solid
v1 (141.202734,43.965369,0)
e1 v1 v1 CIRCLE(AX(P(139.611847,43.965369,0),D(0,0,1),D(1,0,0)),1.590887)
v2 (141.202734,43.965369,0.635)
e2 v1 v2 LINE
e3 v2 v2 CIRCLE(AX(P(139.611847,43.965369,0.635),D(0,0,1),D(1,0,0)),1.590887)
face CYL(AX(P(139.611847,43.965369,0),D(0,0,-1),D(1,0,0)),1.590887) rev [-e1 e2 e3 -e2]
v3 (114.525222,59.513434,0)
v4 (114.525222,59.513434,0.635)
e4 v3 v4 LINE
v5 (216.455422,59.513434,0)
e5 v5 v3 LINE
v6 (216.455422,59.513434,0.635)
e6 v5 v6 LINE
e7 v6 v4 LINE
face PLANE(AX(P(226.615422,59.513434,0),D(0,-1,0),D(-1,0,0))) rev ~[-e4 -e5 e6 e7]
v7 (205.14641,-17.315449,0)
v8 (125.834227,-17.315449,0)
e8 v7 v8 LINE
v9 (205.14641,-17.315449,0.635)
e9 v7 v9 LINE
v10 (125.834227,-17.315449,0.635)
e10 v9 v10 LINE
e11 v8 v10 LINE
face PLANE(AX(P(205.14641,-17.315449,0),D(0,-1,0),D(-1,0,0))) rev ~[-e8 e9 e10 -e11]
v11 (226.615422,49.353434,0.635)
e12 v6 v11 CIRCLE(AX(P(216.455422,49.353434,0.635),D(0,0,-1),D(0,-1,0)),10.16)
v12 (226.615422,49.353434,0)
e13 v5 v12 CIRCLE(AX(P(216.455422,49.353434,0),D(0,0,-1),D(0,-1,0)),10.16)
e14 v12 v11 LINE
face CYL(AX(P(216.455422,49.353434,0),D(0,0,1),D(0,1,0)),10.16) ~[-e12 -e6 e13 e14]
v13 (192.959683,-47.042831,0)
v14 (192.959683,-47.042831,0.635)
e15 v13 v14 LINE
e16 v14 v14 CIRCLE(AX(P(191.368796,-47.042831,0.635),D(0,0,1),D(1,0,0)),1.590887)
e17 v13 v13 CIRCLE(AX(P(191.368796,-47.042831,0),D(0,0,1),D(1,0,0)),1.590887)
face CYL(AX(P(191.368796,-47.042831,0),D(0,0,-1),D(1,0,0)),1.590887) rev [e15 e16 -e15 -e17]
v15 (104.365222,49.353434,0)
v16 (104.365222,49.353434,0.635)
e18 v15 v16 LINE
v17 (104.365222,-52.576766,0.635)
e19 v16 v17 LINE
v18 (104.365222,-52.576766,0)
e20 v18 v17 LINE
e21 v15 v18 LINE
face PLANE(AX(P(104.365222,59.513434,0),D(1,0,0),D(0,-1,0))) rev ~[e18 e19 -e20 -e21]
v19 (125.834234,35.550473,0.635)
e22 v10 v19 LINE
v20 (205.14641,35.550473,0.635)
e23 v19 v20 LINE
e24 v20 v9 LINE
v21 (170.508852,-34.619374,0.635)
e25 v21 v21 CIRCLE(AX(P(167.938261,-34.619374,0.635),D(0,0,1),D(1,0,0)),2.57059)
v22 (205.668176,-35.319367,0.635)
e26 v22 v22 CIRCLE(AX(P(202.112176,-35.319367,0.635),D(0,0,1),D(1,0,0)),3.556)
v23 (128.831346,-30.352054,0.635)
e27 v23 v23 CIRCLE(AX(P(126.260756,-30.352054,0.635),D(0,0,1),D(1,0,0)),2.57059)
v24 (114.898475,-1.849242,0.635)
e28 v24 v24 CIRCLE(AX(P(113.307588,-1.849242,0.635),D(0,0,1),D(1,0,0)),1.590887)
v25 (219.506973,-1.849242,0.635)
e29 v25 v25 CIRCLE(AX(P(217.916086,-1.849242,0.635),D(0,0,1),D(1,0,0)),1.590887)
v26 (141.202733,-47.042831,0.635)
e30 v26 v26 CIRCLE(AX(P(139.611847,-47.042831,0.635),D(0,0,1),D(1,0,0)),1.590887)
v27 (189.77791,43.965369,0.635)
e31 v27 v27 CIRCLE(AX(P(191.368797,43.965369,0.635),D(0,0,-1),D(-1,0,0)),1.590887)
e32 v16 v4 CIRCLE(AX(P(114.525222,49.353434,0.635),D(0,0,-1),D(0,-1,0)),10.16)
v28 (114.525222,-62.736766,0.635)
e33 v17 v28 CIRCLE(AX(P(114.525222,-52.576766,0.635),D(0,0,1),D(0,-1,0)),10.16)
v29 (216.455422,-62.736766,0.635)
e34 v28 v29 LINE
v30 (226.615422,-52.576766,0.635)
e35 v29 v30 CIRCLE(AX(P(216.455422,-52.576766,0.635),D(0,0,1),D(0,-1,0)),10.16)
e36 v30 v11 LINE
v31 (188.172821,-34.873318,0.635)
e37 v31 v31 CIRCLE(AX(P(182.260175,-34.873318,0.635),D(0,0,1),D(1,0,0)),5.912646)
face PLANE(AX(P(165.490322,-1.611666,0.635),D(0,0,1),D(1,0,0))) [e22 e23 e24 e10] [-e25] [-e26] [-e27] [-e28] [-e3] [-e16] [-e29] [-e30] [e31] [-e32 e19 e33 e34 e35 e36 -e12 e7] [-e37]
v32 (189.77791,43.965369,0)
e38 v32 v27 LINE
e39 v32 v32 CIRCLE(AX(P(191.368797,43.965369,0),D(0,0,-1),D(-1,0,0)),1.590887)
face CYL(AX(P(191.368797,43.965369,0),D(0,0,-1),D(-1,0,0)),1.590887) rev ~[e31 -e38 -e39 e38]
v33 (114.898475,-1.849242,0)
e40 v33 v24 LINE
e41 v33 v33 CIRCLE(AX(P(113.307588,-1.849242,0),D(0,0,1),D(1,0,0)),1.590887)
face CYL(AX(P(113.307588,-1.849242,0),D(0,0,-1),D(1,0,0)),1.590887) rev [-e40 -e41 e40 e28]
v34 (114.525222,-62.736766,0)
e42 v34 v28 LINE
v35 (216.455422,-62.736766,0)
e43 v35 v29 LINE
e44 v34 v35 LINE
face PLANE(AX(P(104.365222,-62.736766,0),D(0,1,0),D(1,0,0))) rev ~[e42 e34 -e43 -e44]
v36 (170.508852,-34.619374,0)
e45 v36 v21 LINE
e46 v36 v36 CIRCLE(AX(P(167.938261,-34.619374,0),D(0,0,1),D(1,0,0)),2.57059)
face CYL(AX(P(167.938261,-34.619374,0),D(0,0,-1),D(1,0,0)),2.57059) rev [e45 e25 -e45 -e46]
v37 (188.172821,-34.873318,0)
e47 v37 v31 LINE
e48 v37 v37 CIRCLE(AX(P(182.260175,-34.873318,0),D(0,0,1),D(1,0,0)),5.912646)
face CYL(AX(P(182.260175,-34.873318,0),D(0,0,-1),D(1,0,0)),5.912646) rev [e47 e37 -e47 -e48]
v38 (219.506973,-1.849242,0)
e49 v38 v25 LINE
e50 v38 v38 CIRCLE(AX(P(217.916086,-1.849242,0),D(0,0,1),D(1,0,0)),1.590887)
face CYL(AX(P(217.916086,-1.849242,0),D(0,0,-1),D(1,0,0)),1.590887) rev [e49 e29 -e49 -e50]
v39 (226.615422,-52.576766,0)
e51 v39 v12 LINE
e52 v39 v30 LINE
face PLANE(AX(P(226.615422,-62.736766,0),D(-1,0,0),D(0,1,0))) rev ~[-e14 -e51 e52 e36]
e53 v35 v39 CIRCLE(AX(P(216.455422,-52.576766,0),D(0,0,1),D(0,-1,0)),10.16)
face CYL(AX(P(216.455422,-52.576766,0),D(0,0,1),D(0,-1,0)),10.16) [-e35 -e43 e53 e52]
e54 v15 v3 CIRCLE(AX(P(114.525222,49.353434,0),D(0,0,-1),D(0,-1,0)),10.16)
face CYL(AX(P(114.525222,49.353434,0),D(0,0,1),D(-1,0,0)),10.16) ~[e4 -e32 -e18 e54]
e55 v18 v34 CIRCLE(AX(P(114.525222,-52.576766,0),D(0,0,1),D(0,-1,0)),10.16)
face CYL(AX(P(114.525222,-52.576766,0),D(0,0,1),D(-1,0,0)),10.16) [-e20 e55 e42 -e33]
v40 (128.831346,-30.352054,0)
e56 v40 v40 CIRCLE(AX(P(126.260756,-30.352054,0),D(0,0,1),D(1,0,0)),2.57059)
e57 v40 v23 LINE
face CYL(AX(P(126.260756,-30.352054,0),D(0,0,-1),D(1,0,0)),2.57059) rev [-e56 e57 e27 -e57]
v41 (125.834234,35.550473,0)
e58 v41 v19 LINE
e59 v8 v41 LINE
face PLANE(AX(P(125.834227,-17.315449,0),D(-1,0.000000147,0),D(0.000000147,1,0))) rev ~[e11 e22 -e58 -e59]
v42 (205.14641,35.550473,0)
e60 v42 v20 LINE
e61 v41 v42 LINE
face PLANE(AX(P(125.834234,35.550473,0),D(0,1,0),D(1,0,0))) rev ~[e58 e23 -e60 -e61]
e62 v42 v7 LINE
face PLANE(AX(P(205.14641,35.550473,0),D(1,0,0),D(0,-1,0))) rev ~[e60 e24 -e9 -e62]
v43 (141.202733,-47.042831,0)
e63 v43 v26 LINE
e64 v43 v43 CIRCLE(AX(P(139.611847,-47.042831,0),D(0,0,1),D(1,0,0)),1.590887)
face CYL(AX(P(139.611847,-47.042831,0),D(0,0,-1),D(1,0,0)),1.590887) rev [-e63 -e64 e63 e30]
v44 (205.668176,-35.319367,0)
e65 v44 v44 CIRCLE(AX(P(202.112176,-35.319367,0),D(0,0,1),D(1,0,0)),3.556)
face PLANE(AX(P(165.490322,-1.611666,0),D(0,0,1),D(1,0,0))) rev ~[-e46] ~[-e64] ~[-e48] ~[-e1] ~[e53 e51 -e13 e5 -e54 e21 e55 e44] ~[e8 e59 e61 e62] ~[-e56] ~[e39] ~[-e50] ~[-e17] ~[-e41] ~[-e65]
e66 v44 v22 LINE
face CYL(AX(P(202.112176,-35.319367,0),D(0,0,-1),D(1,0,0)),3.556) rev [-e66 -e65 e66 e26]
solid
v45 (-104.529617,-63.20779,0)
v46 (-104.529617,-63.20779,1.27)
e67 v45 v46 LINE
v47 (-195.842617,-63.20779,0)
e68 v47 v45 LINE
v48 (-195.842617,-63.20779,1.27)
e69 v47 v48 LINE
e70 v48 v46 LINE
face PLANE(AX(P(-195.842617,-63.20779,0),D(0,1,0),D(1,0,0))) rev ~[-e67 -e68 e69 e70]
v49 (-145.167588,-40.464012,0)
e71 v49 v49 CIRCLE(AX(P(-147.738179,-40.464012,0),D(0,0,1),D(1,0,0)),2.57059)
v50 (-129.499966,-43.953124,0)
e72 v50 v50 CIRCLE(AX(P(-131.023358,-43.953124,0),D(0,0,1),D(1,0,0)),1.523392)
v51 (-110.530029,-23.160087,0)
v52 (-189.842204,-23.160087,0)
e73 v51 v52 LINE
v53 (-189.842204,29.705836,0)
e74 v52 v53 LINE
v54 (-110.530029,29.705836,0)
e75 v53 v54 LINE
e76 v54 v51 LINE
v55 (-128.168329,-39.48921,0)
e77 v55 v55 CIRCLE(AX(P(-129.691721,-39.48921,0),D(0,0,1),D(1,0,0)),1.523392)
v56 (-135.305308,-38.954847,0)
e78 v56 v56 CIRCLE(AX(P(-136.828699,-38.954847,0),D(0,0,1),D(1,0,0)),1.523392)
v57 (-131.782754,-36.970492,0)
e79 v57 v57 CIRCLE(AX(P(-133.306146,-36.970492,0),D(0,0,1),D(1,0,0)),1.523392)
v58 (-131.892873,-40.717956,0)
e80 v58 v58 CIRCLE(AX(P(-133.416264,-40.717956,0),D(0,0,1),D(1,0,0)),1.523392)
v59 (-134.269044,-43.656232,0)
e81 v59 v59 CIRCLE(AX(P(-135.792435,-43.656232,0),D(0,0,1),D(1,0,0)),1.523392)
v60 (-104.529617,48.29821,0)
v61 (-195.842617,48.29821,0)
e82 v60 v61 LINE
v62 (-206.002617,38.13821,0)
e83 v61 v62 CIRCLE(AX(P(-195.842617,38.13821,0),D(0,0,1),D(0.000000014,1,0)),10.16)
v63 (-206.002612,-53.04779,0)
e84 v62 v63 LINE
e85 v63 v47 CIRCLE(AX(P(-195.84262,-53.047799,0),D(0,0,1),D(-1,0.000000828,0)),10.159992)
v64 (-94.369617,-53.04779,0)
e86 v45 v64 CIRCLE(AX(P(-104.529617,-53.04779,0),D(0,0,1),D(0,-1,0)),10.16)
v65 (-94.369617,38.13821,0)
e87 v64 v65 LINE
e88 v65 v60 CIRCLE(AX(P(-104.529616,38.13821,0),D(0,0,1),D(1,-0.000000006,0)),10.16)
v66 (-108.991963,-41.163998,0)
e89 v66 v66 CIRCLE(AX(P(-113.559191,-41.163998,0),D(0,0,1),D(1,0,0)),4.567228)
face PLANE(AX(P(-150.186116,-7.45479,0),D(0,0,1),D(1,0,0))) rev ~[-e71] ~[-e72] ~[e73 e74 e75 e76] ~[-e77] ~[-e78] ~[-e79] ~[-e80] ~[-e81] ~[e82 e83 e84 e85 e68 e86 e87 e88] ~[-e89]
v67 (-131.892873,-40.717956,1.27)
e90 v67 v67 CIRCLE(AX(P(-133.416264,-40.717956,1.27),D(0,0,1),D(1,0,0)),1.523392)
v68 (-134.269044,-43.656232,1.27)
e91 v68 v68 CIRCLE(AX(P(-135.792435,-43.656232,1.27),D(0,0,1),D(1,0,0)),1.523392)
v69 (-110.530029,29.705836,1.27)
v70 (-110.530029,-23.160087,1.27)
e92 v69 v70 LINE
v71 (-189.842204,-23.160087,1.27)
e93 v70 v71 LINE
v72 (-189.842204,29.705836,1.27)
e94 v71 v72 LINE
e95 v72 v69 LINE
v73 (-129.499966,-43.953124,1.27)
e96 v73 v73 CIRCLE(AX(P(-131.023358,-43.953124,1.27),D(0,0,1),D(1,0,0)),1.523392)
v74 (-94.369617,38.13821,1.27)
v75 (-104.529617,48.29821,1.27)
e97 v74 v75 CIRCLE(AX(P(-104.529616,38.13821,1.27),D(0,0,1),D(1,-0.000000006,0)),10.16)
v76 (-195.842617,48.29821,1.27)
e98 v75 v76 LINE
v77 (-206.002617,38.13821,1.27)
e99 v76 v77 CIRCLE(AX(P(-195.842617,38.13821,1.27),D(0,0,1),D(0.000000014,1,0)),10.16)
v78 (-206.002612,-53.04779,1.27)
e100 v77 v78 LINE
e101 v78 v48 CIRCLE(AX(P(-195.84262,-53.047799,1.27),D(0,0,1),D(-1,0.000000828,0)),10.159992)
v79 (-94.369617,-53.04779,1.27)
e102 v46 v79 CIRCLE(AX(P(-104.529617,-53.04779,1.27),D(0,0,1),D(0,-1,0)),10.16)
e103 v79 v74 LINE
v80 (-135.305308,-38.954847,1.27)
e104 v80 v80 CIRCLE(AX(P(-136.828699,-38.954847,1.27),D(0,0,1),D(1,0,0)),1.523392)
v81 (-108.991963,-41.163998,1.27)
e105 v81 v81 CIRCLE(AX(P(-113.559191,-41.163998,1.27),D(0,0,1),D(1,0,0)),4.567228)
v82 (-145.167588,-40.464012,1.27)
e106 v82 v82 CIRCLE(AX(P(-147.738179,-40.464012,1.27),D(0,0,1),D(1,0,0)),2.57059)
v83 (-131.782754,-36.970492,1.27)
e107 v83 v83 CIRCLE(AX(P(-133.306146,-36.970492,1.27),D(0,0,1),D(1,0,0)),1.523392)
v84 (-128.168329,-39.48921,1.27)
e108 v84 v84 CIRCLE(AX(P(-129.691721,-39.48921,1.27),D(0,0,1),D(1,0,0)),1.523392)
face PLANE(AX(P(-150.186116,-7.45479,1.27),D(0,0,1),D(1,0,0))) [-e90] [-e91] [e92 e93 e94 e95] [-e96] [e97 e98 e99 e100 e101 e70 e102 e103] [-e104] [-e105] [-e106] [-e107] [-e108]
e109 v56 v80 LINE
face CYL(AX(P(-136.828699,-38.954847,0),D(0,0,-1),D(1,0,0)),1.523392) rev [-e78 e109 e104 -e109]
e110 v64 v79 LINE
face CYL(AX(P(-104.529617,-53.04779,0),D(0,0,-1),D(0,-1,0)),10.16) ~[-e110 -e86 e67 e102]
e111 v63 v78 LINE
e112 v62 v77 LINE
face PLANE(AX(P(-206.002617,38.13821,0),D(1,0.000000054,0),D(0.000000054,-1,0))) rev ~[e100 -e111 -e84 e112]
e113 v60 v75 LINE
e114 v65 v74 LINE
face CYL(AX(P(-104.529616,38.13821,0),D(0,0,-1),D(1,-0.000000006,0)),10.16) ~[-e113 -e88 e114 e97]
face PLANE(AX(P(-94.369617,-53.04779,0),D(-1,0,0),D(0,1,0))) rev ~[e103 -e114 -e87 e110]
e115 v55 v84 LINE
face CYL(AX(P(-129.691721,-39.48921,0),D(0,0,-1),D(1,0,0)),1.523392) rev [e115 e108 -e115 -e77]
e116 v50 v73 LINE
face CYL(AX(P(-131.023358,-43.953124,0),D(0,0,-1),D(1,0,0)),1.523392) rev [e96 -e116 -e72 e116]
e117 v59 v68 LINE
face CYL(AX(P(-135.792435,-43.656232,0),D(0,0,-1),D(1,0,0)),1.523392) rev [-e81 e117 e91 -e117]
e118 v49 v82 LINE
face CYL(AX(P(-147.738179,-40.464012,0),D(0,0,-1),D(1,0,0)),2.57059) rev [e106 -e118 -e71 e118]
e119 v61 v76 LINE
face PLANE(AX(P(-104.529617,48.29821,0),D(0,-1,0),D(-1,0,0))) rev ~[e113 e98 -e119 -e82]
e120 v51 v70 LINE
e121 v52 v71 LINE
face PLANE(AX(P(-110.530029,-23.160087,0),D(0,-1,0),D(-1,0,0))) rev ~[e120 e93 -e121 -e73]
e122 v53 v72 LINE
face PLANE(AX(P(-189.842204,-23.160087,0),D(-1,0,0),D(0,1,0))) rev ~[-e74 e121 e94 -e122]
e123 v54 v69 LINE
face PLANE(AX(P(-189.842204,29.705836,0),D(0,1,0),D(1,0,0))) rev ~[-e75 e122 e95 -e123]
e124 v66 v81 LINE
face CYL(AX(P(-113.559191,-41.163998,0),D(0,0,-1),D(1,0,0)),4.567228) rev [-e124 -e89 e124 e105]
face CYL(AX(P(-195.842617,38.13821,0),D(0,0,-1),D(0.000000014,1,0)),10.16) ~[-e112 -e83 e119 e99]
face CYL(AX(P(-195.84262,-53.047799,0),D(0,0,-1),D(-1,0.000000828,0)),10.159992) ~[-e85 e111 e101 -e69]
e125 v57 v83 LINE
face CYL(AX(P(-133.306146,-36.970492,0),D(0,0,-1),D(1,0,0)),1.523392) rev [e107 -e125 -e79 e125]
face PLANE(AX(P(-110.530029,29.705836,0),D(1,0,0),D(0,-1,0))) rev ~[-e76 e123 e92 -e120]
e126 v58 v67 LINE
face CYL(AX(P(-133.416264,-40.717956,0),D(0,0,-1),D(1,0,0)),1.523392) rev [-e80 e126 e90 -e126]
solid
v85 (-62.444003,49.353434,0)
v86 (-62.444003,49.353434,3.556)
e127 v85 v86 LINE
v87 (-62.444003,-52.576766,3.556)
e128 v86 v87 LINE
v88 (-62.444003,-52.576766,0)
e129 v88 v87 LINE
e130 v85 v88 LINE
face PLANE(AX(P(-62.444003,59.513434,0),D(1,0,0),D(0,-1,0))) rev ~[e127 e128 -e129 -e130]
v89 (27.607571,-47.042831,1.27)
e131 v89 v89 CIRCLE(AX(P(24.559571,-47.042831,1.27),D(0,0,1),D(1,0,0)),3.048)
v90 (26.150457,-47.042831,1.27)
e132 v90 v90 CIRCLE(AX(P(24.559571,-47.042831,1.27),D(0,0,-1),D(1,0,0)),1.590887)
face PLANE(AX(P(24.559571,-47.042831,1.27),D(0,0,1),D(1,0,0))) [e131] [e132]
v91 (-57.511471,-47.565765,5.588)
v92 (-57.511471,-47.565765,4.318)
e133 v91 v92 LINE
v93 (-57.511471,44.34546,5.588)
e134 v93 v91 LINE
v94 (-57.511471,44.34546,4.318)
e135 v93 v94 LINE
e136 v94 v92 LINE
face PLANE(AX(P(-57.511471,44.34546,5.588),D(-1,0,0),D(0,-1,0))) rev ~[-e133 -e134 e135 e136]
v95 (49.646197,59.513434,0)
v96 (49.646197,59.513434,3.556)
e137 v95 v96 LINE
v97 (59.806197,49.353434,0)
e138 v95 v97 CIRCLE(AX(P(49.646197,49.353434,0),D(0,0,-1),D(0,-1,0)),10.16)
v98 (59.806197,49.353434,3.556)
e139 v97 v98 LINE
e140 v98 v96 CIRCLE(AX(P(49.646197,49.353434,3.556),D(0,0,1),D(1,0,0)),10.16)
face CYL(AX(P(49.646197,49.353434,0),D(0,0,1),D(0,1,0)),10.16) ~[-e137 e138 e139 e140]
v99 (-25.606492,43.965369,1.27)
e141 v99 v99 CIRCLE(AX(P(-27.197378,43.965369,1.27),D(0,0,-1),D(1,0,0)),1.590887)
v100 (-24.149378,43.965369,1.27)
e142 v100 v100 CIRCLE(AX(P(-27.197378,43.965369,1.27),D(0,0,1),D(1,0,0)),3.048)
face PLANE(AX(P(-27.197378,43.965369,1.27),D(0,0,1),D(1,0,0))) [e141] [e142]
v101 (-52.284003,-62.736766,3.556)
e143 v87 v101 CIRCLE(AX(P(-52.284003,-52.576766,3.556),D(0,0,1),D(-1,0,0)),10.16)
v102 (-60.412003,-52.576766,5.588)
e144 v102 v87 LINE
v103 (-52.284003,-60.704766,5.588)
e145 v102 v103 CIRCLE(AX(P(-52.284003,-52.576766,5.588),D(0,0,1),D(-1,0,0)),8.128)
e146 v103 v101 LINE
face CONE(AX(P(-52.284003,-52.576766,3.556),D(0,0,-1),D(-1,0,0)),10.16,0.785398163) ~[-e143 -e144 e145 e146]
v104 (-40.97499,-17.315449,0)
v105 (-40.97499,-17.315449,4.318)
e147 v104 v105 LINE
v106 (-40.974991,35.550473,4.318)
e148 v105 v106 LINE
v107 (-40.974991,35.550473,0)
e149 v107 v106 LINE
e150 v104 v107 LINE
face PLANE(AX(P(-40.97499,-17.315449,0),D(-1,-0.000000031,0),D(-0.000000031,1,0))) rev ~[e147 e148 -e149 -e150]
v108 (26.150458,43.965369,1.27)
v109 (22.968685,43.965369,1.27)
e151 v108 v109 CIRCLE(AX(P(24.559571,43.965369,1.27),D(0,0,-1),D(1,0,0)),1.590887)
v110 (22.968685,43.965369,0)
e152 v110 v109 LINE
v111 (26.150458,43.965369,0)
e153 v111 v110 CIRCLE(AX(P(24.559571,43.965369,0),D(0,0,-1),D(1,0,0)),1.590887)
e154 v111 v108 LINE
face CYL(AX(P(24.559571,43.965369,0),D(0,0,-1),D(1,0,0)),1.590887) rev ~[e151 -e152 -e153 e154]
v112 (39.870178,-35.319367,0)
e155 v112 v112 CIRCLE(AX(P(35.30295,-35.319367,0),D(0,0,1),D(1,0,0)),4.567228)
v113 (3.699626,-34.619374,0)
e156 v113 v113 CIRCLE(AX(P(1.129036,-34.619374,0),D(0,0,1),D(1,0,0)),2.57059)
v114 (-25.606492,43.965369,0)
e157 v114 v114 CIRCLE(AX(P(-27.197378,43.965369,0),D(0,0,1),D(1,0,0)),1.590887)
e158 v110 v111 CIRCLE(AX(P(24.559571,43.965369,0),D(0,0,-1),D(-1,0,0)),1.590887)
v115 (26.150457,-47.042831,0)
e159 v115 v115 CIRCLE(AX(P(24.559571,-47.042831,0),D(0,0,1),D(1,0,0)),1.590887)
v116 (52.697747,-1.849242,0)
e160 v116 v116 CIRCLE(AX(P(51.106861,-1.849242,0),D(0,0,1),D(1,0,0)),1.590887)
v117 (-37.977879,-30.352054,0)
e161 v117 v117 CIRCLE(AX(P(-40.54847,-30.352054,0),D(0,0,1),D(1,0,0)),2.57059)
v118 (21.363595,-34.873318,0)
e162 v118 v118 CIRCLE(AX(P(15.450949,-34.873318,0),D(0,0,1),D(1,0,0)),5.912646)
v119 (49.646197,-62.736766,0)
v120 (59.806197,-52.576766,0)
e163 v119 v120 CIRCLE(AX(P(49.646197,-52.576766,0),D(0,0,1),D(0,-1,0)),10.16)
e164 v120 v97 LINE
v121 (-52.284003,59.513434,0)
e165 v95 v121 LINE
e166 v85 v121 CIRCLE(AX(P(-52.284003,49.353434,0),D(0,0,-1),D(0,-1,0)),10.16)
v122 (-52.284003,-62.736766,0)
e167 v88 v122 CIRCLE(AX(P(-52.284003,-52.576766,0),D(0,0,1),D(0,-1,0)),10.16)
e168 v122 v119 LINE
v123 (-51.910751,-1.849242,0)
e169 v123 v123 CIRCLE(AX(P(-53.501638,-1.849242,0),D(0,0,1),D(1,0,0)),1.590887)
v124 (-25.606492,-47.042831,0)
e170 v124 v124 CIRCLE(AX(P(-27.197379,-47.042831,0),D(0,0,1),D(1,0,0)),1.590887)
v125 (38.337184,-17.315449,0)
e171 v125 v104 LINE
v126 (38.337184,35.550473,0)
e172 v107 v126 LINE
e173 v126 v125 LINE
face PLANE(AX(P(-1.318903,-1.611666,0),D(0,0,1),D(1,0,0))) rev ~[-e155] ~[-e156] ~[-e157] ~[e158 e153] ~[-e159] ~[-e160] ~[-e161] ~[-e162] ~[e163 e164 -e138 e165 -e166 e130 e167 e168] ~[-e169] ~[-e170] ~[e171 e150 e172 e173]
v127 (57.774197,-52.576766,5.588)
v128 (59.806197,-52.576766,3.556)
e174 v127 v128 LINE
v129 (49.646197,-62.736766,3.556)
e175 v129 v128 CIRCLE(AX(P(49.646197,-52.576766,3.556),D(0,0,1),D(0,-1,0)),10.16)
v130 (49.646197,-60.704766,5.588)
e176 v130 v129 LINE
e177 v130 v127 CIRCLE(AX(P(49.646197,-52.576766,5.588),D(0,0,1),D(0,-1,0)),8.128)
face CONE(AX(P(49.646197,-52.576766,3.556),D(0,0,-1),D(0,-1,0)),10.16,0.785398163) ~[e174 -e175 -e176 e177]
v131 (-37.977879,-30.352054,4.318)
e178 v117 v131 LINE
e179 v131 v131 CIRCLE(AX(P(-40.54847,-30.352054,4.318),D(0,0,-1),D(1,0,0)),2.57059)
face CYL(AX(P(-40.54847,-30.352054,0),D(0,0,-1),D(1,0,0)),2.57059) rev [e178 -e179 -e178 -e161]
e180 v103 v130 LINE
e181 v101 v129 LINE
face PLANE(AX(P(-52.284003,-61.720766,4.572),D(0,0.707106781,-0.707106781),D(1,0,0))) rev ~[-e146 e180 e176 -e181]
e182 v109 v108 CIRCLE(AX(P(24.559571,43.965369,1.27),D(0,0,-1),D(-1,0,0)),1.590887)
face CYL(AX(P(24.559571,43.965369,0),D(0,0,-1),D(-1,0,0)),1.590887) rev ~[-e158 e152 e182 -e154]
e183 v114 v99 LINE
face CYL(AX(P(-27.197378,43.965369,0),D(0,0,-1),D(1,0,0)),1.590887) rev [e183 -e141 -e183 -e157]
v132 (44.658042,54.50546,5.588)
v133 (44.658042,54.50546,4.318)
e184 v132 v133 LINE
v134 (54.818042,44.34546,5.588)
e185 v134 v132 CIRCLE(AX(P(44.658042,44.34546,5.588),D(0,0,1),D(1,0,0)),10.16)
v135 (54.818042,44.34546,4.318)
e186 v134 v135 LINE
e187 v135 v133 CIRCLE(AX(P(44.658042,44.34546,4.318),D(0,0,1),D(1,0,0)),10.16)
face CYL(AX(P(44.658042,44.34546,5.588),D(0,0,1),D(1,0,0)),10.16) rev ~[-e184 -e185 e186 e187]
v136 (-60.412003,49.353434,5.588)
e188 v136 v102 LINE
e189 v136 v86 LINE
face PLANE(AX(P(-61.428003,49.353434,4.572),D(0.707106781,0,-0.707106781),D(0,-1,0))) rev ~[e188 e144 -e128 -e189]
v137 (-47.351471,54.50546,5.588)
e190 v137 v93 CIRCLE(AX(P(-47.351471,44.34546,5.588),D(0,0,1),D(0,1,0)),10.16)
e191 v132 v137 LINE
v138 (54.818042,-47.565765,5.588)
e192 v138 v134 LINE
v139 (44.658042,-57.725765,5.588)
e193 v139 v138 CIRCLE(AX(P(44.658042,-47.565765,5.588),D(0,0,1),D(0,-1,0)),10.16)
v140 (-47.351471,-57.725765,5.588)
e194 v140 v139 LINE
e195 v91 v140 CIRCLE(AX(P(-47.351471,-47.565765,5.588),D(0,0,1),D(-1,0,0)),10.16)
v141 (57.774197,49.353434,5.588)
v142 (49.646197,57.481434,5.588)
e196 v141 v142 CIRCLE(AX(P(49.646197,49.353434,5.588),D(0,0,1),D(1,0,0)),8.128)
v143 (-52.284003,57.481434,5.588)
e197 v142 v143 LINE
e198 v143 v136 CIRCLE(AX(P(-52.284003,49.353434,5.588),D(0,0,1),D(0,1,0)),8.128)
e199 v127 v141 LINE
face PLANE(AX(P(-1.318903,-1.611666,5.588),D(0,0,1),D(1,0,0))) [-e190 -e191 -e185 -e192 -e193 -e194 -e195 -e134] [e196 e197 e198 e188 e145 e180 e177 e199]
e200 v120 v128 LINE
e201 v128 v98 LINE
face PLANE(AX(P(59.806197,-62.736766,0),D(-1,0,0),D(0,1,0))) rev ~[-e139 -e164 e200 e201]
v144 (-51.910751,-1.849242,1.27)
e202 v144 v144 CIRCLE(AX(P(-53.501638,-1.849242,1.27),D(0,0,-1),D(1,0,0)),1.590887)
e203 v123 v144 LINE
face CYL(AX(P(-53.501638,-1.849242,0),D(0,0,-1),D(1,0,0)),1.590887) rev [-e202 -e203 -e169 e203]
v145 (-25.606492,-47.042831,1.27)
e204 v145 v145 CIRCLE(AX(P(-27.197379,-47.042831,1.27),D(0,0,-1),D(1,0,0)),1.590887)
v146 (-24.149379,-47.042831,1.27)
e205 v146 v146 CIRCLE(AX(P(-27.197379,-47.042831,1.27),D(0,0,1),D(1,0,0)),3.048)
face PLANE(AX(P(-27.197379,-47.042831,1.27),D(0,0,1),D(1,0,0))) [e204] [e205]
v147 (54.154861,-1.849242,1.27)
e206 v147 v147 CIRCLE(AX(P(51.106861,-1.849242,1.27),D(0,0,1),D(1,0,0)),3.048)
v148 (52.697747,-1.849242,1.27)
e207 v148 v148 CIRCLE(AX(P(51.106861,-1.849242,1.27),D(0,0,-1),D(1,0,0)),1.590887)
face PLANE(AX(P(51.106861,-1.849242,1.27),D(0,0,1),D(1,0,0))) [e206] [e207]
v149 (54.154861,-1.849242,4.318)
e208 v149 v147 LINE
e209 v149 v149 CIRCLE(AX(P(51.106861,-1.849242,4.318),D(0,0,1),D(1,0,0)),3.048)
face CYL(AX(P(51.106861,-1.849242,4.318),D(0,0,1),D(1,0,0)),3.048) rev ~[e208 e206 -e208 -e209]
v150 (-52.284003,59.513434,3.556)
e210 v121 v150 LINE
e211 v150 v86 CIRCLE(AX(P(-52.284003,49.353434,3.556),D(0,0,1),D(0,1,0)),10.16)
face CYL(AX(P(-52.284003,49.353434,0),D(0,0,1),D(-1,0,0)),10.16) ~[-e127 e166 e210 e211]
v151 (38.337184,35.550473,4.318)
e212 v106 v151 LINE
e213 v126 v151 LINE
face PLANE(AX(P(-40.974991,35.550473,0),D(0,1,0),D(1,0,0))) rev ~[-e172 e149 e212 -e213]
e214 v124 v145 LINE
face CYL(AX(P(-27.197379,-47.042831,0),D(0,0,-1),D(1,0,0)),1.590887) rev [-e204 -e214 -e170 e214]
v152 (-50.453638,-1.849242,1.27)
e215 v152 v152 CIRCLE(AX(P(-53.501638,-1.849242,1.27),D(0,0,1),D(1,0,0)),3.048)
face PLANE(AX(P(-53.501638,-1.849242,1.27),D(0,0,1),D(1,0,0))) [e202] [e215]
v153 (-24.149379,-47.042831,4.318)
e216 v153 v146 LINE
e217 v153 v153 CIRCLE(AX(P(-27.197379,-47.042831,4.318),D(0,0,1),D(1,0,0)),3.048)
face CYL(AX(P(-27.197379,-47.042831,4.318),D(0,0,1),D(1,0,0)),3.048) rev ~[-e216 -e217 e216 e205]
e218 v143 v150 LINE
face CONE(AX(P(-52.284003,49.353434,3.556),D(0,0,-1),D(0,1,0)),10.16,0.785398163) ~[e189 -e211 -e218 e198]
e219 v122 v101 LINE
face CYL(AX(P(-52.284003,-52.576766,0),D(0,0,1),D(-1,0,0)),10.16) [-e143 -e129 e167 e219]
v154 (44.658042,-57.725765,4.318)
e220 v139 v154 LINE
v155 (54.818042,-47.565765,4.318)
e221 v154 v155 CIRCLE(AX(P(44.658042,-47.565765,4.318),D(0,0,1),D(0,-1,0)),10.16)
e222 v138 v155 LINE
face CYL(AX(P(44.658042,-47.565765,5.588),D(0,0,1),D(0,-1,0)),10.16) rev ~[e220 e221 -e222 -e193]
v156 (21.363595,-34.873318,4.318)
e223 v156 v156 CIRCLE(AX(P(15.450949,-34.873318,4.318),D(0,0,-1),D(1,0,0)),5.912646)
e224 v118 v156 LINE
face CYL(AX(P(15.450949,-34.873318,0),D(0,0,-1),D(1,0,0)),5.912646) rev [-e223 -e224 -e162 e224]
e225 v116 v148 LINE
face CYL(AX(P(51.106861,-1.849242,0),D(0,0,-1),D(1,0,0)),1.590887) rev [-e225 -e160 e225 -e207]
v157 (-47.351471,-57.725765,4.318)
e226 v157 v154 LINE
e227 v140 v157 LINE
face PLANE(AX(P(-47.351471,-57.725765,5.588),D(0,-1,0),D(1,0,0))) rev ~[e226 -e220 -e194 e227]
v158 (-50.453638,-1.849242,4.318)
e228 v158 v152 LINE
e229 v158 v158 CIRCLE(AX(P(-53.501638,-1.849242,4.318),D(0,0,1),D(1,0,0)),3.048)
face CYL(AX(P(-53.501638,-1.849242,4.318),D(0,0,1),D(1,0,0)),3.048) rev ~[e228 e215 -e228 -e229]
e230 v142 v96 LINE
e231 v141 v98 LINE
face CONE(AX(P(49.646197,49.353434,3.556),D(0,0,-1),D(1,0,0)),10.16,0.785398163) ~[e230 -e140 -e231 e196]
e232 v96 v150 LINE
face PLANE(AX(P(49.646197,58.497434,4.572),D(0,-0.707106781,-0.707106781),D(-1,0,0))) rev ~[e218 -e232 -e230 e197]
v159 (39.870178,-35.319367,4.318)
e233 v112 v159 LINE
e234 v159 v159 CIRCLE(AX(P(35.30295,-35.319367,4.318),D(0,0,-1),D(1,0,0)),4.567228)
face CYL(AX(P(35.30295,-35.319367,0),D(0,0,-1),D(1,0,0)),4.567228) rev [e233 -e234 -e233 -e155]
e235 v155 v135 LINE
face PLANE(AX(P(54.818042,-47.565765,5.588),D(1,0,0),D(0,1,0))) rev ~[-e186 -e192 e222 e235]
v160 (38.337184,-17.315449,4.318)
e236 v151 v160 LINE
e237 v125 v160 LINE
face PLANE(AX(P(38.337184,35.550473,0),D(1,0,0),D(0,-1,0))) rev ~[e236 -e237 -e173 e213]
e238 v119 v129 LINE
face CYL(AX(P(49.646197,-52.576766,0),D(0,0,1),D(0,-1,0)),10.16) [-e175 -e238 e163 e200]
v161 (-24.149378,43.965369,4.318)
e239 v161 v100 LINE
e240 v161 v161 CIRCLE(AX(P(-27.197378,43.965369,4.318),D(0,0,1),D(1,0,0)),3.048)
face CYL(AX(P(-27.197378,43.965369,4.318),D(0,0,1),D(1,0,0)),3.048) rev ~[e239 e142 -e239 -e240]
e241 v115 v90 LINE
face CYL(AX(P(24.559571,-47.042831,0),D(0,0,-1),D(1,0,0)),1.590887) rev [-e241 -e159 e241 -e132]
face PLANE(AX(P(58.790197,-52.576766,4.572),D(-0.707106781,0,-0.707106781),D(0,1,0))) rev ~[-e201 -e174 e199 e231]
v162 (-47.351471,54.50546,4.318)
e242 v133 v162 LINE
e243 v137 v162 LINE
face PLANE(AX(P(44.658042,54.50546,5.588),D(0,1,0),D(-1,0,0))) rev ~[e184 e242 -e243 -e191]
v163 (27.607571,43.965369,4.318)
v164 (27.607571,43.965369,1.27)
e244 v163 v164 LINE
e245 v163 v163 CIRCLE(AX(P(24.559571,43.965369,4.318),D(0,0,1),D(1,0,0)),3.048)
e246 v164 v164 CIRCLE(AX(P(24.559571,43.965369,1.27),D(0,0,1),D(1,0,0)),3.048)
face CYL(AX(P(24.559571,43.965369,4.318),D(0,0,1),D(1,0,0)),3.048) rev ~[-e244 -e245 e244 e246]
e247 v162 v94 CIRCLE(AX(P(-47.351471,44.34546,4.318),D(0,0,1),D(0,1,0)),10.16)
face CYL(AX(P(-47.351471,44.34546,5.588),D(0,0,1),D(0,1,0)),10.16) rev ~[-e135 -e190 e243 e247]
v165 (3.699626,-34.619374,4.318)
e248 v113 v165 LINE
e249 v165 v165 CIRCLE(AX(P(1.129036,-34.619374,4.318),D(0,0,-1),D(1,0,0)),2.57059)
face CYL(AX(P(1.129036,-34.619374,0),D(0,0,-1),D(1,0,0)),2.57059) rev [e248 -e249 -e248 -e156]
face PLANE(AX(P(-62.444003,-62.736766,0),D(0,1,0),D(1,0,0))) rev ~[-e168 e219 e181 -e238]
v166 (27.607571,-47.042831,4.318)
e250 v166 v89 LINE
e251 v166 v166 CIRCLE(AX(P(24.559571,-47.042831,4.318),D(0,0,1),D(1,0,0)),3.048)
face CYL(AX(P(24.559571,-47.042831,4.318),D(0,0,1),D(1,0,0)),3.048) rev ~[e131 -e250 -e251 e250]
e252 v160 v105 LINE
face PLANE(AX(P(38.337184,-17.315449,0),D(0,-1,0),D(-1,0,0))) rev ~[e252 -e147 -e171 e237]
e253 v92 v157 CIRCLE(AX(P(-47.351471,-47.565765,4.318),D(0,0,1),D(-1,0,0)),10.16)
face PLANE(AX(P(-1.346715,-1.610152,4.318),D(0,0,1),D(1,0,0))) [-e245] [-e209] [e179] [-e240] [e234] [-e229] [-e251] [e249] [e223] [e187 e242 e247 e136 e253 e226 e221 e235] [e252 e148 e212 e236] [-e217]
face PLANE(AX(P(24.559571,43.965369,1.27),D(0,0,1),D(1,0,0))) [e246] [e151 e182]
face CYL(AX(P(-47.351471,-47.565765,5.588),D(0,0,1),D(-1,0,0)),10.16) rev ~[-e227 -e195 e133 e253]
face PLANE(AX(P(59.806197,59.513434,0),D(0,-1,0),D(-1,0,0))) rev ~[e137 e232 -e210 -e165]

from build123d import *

# Parameters (mm, degrees)
F0_R      = 1.5908867155
F0_R_2    = 2.5705904527
F0_R_3    = 5.9126459129
F0_R_4    = 4.5672278398
F1_DEPTH  = 5.588
F2_R      = 10.16
F3_SIZE   = 2.032
F0_R_5    = 3.556
F4_DEPTH  = 0.635
F5_R      = 10.16
F7_DEPTH  = 1.27
F8_R      = 3.048
F9_DEPTH  = 3.048
F10_R     = 2.5705904527
F10_R_2   = 1.5233915353
F10_R_3   = 4.5672278398
F11_DEPTH = 1.27


# Not quite as in the source:
# - ends of sketch curves that miss each other by under 0.0002 mm in the source are joined


with BuildPart() as f1:
    # F0 (on Top) → F1 (new body)
    with BuildSketch(Plane.XY):
        Polygon((-1.3189034303, 59.5134341434), (-62.4440034303, 59.5134341434), (-62.4440034303, -62.7367658566), (59.8061965697, -62.7367658566), (59.8061965697, 59.5134341434), align=None)
        with Locations((-27.1973789436, -47.042830537)):
            Circle(F0_R, mode=Mode.SUBTRACT)
        with Locations((1.1290358546, -34.6193742007)):
            Circle(F0_R_2, mode=Mode.SUBTRACT)
        with Locations((24.5595706861, -47.042830537)):
            Circle(F0_R, mode=Mode.SUBTRACT)
        with Locations((15.450949059, -34.8733179271)):
            Circle(F0_R_3, mode=Mode.SUBTRACT)
        with Locations((35.3029502789, -35.3193674237)):
            Circle(F0_R_4, mode=Mode.SUBTRACT)
        with Locations((-40.5484696616, -30.3520541638)):
            Circle(F0_R_2, mode=Mode.SUBTRACT)
        with Locations((-53.5016377839, -1.8492421368)):
            Circle(F0_R, mode=Mode.SUBTRACT)
        with Locations((51.1068607298, -1.8492421368)):
            Circle(F0_R, mode=Mode.SUBTRACT)
        Polygon((-40.9749911864, 35.5504732579), (-1.3189034303, 35.5504732579), (38.3371843259, 35.5504732579), (38.3371843259, -17.3154491931), (-40.9749895334, -17.3154491931), align=None, mode=Mode.SUBTRACT)
        with Locations((-27.1973782451, 43.965369463)):
            Circle(F0_R, mode=Mode.SUBTRACT)
        with BuildLine():
            ThreePointArc((26.1504581, 43.965369463), (24.5595713845, 42.3744827475), (22.9686846691, 43.965369463))
            ThreePointArc((22.9686846691, 43.965369463), (24.5595713845, 45.5562561785), (26.1504581, 43.965369463))
        make_face(mode=Mode.SUBTRACT)
    extrude(amount=F1_DEPTH)

    # F2
    f2_edges = [f1.edges().sort_by_distance(p)[0] for p in [
        (-62.444003, 59.513434, 2.794),
        (-62.444003, -62.736766, 2.794),
        (59.806197, -62.736766, 2.794),
        (59.806197, 59.513434, 2.794),
    ]]
    fillet(f2_edges, radius=F2_R)

    # F3
    f3_edges = [f1.edges().sort_by_distance(p)[0] for p in [
        (-1.318903, 59.513434, 5.588),
    ]]
    chamfer(f3_edges, length=F3_SIZE)

    # F6 (on face) → F7 (cut)
    with BuildSketch(Plane.XY.offset(5.588)):
        with BuildLine():
            ThreePointArc((-57.5114712119, -47.565764811), (-54.5356761088, -54.7499697079), (-47.3514712119, -57.725764811))
            Line((-47.3514712119, -57.725764811), (-5.00380015, -57.725764811))
            Line((-5.00380015, -57.725764811), (44.6580416226, -57.725764811))
            ThreePointArc((44.6580416226, -57.725764811), (51.8422465195, -54.7499697079), (54.8180416226, -47.565764811))
            Line((54.8180416226, -47.565764811), (54.8180416226, 0))
            Line((54.8180416226, 0), (54.8180416226, 44.3454599643))
            ThreePointArc((54.8180416226, 44.3454599643), (51.8422465195, 51.5296648611), (44.6580416226, 54.5054599643))
            Line((44.6580416226, 54.5054599643), (-1.3284197776, 54.5054599643))
            Line((-1.3284197776, 54.5054599643), (-47.3514712119, 54.5054599643))
            ThreePointArc((-47.3514712119, 54.5054599643), (-54.5356761088, 51.5296648611), (-57.5114712119, 44.3454599643))
            Line((-57.5114712119, 44.3454599643), (-57.5114712119, 0))
            Line((-57.5114712119, 0), (-57.5114712119, -47.565764811))
        make_face()
    extrude(amount=-F7_DEPTH, mode=Mode.SUBTRACT)

    # F8 (on face) → F9 (cut)
    with BuildSketch(Plane.XY.offset(4.318)):
        with Locations((-27.1973782451, 43.965369463)):
            Circle(F8_R)
        with Locations((24.5595713845, 43.965369463)):
            Circle(F8_R)
        with Locations((-27.1973789436, -47.042830537)):
            Circle(F8_R)
        with Locations((24.5595706861, -47.042830537)):
            Circle(F8_R)
        with Locations((-53.5016377839, -1.8492421368)):
            Circle(F8_R)
        with Locations((51.1068607298, -1.8492421368)):
            Circle(F8_R)
    extrude(amount=-F9_DEPTH, mode=Mode.SUBTRACT)


with BuildPart() as f4:
    # F0 (on Top) → F4 (new body)
    with BuildSketch(Plane.XY):
        Polygon((165.490322156, 59.5134341434), (104.365222156, 59.5134341434), (104.365222156, -62.7367658566), (226.615422156, -62.7367658566), (226.615422156, 59.5134341434), align=None)
        with Locations((139.6118466427, -47.042830537)):
            Circle(F0_R, mode=Mode.SUBTRACT)
        with Locations((167.9382614409, -34.6193742007)):
            Circle(F0_R_2, mode=Mode.SUBTRACT)
        with Locations((182.2601746453, -34.8733179271)):
            Circle(F0_R_3, mode=Mode.SUBTRACT)
        with Locations((191.3687962724, -47.042830537)):
            Circle(F0_R, mode=Mode.SUBTRACT)
        with Locations((202.1121758653, -35.3193674237)):
            Circle(F0_R_5, mode=Mode.SUBTRACT)
        with Locations((126.2607559247, -30.3520541638)):
            Circle(F0_R_2, mode=Mode.SUBTRACT)
        with Locations((113.3075878024, -1.8492421368)):
            Circle(F0_R, mode=Mode.SUBTRACT)
        with Locations((217.9160863161, -1.8492421368)):
            Circle(F0_R, mode=Mode.SUBTRACT)
        Polygon((125.8342343999, 35.5504732579), (165.490322156, 35.5504732579), (205.1464099122, 35.5504732579), (205.1464099122, -17.3154491931), (125.8342266083, -17.3154491931), align=None, mode=Mode.SUBTRACT)
        with Locations((139.6118473412, 43.965369463)):
            Circle(F0_R, mode=Mode.SUBTRACT)
        with BuildLine():
            ThreePointArc((192.9596836864, 43.965369463), (191.3687969709, 42.3744827475), (189.7779102554, 43.965369463))
            ThreePointArc((189.7779102554, 43.965369463), (191.3687969709, 45.5562561785), (192.9596836864, 43.965369463))
        make_face(mode=Mode.SUBTRACT)
    extrude(amount=F4_DEPTH)

    # F5
    f5_edges = [f4.edges().sort_by_distance(p)[0] for p in [
        (104.365222, -62.736766, 0.3175),
        (226.615422, -62.736766, 0.3175),
        (104.365222, 59.513434, 0.3175),
        (226.615422, 59.513434, 0.3175),
    ]]
    fillet(f5_edges, radius=F5_R)


with BuildPart() as f11:
    # F10 (on Top) → F11 (new body)
    with BuildSketch(Plane.XY):
        with BuildLine():
            Line((-104.529616534, 48.298209825), (-150.186116534, 48.298209825))
            Line((-150.186116534, 48.298209825), (-195.842616534, 48.298209825))
            ThreePointArc((-195.842616534, 48.298209825), (-203.0268214309, 45.3224148025), (-206.002616534, 38.1382099056))
            Line((-206.002616534, 38.1382099056), (-206.0026116043, -53.0477900944))
            ThreePointArc((-206.0026116043, -53.0477900944), (-203.0268214309, -60.2319949912), (-195.842616534, -63.2077900944))
            Line((-195.842616534, -63.2077900944), (-104.529616534, -63.2077900944))
            ThreePointArc((-104.529616534, -63.2077900944), (-97.3454116372, -60.2319949912), (-94.369616534, -53.0477900944))
            Line((-94.369616534, -53.0477900944), (-94.369616534, 38.1382099056))
            ThreePointArc((-94.369616534, 38.1382099056), (-97.3454116372, 45.3224148025), (-104.529616534, 48.298209825))
        make_face()
        with Locations((-147.7381789022, -40.4640119523)):
            Circle(F10_R, mode=Mode.SUBTRACT)
        with Locations((-136.8286990857, -38.954846561)):
            Circle(F10_R_2, mode=Mode.SUBTRACT)
        with Locations((-135.7924354748, -43.6562315569)):
            Circle(F10_R_2, mode=Mode.SUBTRACT)
        with Locations((-131.0233575588, -43.9531244338)):
            Circle(F10_R_2, mode=Mode.SUBTRACT)
        with Locations((-133.4162640448, -40.7179556787)):
            Circle(F10_R_2, mode=Mode.SUBTRACT)
        with Locations((-129.6917208767, -39.4892096519)):
            Circle(F10_R_2, mode=Mode.SUBTRACT)
        with Locations((-133.3061456046, -36.9704924524)):
            Circle(F10_R_2, mode=Mode.SUBTRACT)
        with Locations((-113.5591906324, -41.1639977247)):
            Circle(F10_R_3, mode=Mode.SUBTRACT)
        Polygon((-189.8422042902, -23.1600869447), (-189.8422042902, 29.7058355063), (-150.186116534, 29.7058355063), (-110.5300287779, 29.7058355063), (-110.5300287779, -23.1600869447), align=None, mode=Mode.SUBTRACT)
    extrude(amount=F11_DEPTH)


solid = Compound([f1.part, f4.part, f11.part])
